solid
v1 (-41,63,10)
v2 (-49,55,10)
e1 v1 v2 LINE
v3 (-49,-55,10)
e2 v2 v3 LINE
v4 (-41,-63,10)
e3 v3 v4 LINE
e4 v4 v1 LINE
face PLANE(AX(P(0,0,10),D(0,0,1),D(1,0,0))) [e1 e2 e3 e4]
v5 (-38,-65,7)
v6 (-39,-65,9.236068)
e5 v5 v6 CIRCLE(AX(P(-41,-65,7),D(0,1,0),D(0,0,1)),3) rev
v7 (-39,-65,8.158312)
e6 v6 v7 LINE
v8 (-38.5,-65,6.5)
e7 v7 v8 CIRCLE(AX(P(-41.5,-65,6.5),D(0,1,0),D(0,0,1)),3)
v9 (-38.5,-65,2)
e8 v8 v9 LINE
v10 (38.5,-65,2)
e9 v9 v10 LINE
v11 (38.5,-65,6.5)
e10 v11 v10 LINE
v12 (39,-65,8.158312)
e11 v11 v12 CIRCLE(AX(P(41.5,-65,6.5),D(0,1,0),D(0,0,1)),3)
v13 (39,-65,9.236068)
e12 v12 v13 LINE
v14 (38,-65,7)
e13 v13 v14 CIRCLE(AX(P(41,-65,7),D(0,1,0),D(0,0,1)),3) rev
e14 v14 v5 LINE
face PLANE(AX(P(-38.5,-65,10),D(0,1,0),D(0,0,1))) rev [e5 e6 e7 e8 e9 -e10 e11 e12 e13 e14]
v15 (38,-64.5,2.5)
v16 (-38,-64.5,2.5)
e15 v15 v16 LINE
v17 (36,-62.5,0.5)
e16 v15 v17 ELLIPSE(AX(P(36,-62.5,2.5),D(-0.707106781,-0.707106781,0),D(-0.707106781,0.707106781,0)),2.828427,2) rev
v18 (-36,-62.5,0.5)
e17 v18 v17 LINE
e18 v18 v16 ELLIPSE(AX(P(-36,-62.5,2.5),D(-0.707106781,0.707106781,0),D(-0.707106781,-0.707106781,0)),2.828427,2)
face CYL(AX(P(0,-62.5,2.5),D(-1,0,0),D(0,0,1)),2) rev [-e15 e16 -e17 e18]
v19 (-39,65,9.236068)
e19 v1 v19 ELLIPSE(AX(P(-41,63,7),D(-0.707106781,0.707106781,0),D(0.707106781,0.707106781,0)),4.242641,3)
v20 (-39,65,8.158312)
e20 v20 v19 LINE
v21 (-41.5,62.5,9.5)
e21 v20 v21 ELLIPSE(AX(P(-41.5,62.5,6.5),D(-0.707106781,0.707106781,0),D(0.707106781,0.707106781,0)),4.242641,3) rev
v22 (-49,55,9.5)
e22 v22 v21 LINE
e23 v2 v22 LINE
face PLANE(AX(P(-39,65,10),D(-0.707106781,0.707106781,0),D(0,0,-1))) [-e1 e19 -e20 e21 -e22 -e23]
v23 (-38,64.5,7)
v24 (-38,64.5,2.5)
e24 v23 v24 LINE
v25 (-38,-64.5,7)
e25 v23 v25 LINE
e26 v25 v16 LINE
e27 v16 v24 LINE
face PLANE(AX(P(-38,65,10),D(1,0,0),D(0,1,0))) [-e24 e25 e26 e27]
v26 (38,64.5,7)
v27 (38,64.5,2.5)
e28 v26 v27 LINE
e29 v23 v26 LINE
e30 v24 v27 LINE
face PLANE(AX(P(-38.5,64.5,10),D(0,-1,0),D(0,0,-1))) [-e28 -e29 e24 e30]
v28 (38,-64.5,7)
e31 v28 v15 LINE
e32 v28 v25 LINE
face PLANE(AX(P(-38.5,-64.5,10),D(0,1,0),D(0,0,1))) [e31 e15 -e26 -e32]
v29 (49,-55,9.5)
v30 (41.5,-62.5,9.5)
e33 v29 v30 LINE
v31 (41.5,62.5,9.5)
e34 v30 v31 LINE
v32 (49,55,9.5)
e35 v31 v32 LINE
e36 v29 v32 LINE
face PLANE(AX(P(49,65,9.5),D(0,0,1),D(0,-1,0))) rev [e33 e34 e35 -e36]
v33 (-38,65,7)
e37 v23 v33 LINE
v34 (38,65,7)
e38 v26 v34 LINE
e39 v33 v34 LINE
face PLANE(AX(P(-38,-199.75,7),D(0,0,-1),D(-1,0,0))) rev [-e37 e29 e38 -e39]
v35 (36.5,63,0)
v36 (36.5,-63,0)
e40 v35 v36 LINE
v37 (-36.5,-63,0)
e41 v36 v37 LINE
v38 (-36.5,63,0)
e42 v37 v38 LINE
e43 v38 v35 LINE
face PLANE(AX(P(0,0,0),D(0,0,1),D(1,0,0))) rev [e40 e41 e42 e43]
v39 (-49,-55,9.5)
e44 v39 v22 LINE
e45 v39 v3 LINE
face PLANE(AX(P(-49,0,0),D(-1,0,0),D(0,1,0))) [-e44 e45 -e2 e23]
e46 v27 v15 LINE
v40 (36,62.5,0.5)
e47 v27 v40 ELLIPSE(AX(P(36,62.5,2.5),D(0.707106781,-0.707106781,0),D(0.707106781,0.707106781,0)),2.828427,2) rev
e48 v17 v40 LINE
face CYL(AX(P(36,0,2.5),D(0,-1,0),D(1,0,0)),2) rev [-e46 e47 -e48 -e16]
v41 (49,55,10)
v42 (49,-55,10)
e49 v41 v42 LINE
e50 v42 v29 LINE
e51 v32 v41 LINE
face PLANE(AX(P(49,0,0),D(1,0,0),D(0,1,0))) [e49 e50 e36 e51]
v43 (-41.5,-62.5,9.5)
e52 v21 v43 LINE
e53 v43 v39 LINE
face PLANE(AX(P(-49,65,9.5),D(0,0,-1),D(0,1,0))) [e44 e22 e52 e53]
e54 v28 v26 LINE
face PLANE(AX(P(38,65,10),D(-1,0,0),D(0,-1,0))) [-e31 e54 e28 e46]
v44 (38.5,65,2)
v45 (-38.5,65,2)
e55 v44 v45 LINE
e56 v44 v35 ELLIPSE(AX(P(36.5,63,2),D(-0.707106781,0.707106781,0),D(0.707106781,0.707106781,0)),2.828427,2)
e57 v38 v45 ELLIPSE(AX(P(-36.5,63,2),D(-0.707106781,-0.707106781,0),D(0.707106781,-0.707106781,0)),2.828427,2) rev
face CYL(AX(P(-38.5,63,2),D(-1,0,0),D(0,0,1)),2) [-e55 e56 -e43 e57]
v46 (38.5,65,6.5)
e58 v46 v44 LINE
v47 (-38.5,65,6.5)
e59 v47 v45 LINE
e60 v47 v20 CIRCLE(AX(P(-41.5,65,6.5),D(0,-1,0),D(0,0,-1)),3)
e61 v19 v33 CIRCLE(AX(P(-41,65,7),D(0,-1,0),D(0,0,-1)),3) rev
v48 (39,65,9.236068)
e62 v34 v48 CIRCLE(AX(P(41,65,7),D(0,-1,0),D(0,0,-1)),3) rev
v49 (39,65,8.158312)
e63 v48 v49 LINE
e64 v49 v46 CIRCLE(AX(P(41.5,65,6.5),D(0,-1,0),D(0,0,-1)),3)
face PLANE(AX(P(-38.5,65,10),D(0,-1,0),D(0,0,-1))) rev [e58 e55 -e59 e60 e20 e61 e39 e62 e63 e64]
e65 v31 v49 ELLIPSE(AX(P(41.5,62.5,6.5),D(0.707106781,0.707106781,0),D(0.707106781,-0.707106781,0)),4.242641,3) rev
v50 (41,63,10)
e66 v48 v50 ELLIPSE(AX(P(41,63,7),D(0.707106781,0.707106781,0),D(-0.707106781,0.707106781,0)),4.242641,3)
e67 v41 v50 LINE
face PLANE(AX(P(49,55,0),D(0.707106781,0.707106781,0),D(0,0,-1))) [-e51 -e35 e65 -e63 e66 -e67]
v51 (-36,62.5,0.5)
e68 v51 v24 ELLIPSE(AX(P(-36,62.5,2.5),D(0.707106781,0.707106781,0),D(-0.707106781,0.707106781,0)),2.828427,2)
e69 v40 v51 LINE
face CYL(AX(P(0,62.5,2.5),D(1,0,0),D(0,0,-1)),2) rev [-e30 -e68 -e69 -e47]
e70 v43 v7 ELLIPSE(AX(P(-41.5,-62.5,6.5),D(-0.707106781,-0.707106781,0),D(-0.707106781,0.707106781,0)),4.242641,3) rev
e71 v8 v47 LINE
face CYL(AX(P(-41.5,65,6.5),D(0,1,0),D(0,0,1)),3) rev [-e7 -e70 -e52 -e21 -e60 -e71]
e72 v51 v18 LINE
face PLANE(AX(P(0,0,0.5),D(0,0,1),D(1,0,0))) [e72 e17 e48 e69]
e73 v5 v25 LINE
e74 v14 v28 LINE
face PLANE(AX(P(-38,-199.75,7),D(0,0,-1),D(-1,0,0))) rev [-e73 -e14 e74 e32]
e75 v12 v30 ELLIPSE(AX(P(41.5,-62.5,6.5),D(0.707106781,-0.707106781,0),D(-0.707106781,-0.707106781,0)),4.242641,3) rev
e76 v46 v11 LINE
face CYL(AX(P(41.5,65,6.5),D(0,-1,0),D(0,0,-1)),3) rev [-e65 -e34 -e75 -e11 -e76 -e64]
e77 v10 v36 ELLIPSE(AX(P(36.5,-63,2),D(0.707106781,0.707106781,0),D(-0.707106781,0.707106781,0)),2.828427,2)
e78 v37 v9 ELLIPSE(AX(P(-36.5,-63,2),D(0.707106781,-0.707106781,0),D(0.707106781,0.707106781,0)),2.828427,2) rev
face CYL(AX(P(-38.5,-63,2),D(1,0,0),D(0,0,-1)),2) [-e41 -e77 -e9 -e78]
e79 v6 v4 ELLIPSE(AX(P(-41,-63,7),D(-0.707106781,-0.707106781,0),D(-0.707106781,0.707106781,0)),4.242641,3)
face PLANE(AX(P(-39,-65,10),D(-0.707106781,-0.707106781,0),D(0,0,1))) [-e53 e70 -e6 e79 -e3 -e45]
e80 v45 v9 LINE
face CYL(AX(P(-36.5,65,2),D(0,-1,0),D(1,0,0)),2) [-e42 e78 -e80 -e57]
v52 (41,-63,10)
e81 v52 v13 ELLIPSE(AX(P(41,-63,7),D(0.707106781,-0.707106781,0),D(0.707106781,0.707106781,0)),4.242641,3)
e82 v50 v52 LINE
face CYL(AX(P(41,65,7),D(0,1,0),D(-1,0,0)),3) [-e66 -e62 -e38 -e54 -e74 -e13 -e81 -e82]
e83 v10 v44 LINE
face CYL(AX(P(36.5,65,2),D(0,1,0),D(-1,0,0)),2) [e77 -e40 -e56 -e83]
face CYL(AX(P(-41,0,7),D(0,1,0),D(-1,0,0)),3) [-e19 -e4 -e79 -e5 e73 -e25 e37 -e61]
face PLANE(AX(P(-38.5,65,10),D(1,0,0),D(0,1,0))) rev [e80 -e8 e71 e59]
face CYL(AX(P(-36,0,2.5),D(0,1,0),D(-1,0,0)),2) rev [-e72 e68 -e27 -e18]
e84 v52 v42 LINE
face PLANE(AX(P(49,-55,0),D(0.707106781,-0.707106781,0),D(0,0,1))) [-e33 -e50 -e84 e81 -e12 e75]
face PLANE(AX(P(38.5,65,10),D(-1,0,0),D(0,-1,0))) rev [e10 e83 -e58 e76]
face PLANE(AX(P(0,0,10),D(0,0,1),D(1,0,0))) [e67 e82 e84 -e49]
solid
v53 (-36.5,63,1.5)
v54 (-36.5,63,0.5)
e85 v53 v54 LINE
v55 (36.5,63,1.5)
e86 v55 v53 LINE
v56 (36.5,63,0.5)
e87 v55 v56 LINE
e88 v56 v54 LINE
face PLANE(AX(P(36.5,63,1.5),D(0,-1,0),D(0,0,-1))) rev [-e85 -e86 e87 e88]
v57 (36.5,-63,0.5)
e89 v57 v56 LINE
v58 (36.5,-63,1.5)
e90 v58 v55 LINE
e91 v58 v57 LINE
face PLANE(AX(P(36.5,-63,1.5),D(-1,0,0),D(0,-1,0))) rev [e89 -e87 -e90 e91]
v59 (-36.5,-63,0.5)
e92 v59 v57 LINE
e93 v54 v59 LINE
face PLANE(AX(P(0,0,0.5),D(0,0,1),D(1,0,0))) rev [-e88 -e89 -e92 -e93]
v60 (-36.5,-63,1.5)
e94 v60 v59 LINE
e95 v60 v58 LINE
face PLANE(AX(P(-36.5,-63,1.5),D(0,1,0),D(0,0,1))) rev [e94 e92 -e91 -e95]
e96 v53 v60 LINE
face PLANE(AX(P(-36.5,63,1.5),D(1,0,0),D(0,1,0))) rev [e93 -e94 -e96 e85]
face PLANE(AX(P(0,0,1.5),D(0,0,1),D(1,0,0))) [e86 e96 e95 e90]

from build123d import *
from build123d.topology import SkipClean

# Parameters (mm, degrees)
SKETCH1_W                = 77
SKETCH1_H                = 130
BOSS_EXTRUDE1_DEPTH      = 10
SKETCH2_W                = 0.5
SKETCH2_H                = 130
BOSS_EXTRUDE2_DEPTH      = 10.5
CHAMFER1_SIZE            = 10
CHAMFER1_OF_MIRROR1_SIZE = 10
SHELL1_START             = -38
SHELL1_OUTLINE_W         = 129
SHELL1_OUTLINE_H         = 9.5
SHELL1_DEPTH             = 76
FILLET1_R                = 2
FILLET2_R                = 3
CUT_EXTRUDE1_DEPTH       = 135.25
SKETCH4_W                = 73
SKETCH4_H                = 126
BOSS_EXTRUDE3_DEPTH      = 1


# Read off the part's stored shape, not the designer's step: Shell1
with BuildPart() as part:
    # Sketch1 → Boss-Extrude1 (new body)
    with BuildSketch(Plane.XY):
        Rectangle(SKETCH1_W, SKETCH1_H)
    extrude(amount=BOSS_EXTRUDE1_DEPTH)

    # Sketch2 → Boss-Extrude2 (add)
    with BuildSketch(Plane(origin=(38.5, 0, 0), x_dir=(0, 0, -1), z_dir=(1, 0, 0))):
        with Locations((-9.75, 0)):
            Rectangle(SKETCH2_W, SKETCH2_H)
    boss_extrude2 = extrude(amount=BOSS_EXTRUDE2_DEPTH)

    # Chamfer1
    chamfer1_edges = [part.edges().sort_by_distance(p)[0] for p in [
        (49, -65, 9.75),
        (49, 65, 9.75),
    ]]
    chamfer(chamfer1_edges, length=CHAMFER1_SIZE)

    # Mirror1: Boss-Extrude2 across plane
    add(boss_extrude2.mirror(Plane(origin=(0, 0, 0), x_dir=(0, 0, 1), z_dir=(1, 0, 0))))

    # Chamfer1 of Mirror1
    chamfer1_of_mirror1_edges = [part.edges().sort_by_distance(p)[0] for p in [
        (-49, -65, 9.75),
        (-49, 65, 9.75),
    ]]
    chamfer(chamfer1_of_mirror1_edges, length=CHAMFER1_OF_MIRROR1_SIZE)

    # Shell1 outline → Shell1 (cut)
    with BuildSketch(Plane.YZ.offset(SHELL1_START)):
        with Locations((0, 5.25)):
            Rectangle(SHELL1_OUTLINE_W, SHELL1_OUTLINE_H)
    extrude(amount=SHELL1_DEPTH, mode=Mode.SUBTRACT)

    # Fillet1
    fillet1_edges = [part.edges().sort_by_distance(p)[0] for p in [
        (0, -65, 0),
        (-38.5, 0, 0),
        (0, 65, 0),
        (38.5, 0, 0),
        (38, 0, 0.5),
        (0, 64.5, 0.5),
        (-38, 0, 0.5),
        (0, -64.5, 0.5),
    ]]
    fillet(fillet1_edges, radius=FILLET1_R)

    # Fillet2
    # the kernel refuses this fillet: 3 mm, written as the material it adds along each edge
    with BuildSketch(Plane(origin=(-38.5, 65, 9.5), x_dir=(0, 0, -1), z_dir=(0, -1, 0))) as fillet2_piece_1_section:
        with BuildLine():
            CenterArc((FILLET2_R, -FILLET2_R), FILLET2_R, 90, 90)
            Line((0, -FILLET2_R), (0, 0))
            Line((0, 0), (FILLET2_R, 0))
        make_face()
    fillet2_piece_1 = extrude(amount=130, mode=Mode.PRIVATE)
    fillet2_piece_1 = split(fillet2_piece_1, bisect_by=Plane(origin=(-71.583154454, 32.416845546, 8.827874623), z_dir=(0.7071067811865476, -0.7071067811865476, 0)), keep=Keep.TOP, mode=Mode.PRIVATE)
    fillet2_piece_1 = split(fillet2_piece_1, bisect_by=Plane(origin=(-71.583154454, -32.416845546, 8.827874623), z_dir=(0.7071067811865476, 0.7071067811865476, 0)), keep=Keep.TOP, mode=Mode.PRIVATE)
    add(fillet2_piece_1)
    with BuildSketch(Plane(origin=(38.5, 65, 9.5), x_dir=(0, 0, -1), z_dir=(0, -1, 0))) as fillet2_piece_2_section:
        with BuildLine():
            CenterArc((FILLET2_R, FILLET2_R), FILLET2_R, 180, 90)
            Line((0, FILLET2_R), (0, 0))
            Line((0, 0), (FILLET2_R, 0))
        make_face()
    fillet2_piece_2 = extrude(amount=130, mode=Mode.PRIVATE)
    fillet2_piece_2 = split(fillet2_piece_2, bisect_by=Plane(origin=(71.583154454, 32.416845546, 8.827874623), z_dir=(-0.7071067811865476, -0.7071067811865476, 0)), keep=Keep.TOP, mode=Mode.PRIVATE)
    fillet2_piece_2 = split(fillet2_piece_2, bisect_by=Plane(origin=(71.583154454, -32.416845546, 8.827874623), z_dir=(-0.7071067811865476, 0.7071067811865476, 0)), keep=Keep.TOP, mode=Mode.PRIVATE)
    add(fillet2_piece_2)
    # the kernel refuses this fillet: 3 mm, written as the material it takes off along each edge
    with BuildSketch(Plane(origin=(38, 64.5, 10), x_dir=(1, 0, 0), z_dir=(0, -1, 0))) as fillet2_2_piece_1:
        with BuildLine():
            CenterArc((FILLET2_R, -FILLET2_R), FILLET2_R, 90, 90)
            Line((0, -FILLET2_R), (0, 0))
            Line((0, 0), (FILLET2_R, 0))
        make_face()
    extrude(amount=129, mode=Mode.SUBTRACT)
    with BuildSketch(Plane(origin=(-38, 64.5, 10), x_dir=(-1, 0, 0), z_dir=(0, -1, 0))) as fillet2_2_piece_2:
        with BuildLine():
            CenterArc((FILLET2_R, FILLET2_R), FILLET2_R, 180, 90)
            Line((0, FILLET2_R), (0, 0))
            Line((0, 0), (FILLET2_R, 0))
        make_face()
    extrude(amount=129, mode=Mode.SUBTRACT)

    # Sketch3 → Cut-Extrude1 (cut, symmetric)
    with SkipClean():  # the faces are left unmerged after this step: merging them gives an invalid solid
        with BuildSketch(Plane(origin=(0, -64.5, 0), x_dir=(1, 0, 0), z_dir=(0, 1, 0))):
            with BuildLine():
                Line((-38, -7), (38, -7))
                ThreePointArc((38, -7), (38.401923789, -8.5), (39.5, -9.598076211))
                Line((39.5, -9.598076211), (39.5, -10))
                Line((39.5, -10), (-39.5, -10))
                Line((-39.5, -10), (-39.5, -9.598076211))
                ThreePointArc((-39.5, -9.598076211), (-38.401923789, -8.5), (-38, -7))
            make_face()
        extrude(amount=CUT_EXTRUDE1_DEPTH, both=True, mode=Mode.SUBTRACT)


with BuildPart() as body_2:
    # Sketch4 → Boss-Extrude3 (new body)
    with BuildSketch(Plane.XY.offset(0.5)):
        Rectangle(SKETCH4_W, SKETCH4_H)
    extrude(amount=BOSS_EXTRUDE3_DEPTH)


solid = Compound([part.part, body_2.part])
